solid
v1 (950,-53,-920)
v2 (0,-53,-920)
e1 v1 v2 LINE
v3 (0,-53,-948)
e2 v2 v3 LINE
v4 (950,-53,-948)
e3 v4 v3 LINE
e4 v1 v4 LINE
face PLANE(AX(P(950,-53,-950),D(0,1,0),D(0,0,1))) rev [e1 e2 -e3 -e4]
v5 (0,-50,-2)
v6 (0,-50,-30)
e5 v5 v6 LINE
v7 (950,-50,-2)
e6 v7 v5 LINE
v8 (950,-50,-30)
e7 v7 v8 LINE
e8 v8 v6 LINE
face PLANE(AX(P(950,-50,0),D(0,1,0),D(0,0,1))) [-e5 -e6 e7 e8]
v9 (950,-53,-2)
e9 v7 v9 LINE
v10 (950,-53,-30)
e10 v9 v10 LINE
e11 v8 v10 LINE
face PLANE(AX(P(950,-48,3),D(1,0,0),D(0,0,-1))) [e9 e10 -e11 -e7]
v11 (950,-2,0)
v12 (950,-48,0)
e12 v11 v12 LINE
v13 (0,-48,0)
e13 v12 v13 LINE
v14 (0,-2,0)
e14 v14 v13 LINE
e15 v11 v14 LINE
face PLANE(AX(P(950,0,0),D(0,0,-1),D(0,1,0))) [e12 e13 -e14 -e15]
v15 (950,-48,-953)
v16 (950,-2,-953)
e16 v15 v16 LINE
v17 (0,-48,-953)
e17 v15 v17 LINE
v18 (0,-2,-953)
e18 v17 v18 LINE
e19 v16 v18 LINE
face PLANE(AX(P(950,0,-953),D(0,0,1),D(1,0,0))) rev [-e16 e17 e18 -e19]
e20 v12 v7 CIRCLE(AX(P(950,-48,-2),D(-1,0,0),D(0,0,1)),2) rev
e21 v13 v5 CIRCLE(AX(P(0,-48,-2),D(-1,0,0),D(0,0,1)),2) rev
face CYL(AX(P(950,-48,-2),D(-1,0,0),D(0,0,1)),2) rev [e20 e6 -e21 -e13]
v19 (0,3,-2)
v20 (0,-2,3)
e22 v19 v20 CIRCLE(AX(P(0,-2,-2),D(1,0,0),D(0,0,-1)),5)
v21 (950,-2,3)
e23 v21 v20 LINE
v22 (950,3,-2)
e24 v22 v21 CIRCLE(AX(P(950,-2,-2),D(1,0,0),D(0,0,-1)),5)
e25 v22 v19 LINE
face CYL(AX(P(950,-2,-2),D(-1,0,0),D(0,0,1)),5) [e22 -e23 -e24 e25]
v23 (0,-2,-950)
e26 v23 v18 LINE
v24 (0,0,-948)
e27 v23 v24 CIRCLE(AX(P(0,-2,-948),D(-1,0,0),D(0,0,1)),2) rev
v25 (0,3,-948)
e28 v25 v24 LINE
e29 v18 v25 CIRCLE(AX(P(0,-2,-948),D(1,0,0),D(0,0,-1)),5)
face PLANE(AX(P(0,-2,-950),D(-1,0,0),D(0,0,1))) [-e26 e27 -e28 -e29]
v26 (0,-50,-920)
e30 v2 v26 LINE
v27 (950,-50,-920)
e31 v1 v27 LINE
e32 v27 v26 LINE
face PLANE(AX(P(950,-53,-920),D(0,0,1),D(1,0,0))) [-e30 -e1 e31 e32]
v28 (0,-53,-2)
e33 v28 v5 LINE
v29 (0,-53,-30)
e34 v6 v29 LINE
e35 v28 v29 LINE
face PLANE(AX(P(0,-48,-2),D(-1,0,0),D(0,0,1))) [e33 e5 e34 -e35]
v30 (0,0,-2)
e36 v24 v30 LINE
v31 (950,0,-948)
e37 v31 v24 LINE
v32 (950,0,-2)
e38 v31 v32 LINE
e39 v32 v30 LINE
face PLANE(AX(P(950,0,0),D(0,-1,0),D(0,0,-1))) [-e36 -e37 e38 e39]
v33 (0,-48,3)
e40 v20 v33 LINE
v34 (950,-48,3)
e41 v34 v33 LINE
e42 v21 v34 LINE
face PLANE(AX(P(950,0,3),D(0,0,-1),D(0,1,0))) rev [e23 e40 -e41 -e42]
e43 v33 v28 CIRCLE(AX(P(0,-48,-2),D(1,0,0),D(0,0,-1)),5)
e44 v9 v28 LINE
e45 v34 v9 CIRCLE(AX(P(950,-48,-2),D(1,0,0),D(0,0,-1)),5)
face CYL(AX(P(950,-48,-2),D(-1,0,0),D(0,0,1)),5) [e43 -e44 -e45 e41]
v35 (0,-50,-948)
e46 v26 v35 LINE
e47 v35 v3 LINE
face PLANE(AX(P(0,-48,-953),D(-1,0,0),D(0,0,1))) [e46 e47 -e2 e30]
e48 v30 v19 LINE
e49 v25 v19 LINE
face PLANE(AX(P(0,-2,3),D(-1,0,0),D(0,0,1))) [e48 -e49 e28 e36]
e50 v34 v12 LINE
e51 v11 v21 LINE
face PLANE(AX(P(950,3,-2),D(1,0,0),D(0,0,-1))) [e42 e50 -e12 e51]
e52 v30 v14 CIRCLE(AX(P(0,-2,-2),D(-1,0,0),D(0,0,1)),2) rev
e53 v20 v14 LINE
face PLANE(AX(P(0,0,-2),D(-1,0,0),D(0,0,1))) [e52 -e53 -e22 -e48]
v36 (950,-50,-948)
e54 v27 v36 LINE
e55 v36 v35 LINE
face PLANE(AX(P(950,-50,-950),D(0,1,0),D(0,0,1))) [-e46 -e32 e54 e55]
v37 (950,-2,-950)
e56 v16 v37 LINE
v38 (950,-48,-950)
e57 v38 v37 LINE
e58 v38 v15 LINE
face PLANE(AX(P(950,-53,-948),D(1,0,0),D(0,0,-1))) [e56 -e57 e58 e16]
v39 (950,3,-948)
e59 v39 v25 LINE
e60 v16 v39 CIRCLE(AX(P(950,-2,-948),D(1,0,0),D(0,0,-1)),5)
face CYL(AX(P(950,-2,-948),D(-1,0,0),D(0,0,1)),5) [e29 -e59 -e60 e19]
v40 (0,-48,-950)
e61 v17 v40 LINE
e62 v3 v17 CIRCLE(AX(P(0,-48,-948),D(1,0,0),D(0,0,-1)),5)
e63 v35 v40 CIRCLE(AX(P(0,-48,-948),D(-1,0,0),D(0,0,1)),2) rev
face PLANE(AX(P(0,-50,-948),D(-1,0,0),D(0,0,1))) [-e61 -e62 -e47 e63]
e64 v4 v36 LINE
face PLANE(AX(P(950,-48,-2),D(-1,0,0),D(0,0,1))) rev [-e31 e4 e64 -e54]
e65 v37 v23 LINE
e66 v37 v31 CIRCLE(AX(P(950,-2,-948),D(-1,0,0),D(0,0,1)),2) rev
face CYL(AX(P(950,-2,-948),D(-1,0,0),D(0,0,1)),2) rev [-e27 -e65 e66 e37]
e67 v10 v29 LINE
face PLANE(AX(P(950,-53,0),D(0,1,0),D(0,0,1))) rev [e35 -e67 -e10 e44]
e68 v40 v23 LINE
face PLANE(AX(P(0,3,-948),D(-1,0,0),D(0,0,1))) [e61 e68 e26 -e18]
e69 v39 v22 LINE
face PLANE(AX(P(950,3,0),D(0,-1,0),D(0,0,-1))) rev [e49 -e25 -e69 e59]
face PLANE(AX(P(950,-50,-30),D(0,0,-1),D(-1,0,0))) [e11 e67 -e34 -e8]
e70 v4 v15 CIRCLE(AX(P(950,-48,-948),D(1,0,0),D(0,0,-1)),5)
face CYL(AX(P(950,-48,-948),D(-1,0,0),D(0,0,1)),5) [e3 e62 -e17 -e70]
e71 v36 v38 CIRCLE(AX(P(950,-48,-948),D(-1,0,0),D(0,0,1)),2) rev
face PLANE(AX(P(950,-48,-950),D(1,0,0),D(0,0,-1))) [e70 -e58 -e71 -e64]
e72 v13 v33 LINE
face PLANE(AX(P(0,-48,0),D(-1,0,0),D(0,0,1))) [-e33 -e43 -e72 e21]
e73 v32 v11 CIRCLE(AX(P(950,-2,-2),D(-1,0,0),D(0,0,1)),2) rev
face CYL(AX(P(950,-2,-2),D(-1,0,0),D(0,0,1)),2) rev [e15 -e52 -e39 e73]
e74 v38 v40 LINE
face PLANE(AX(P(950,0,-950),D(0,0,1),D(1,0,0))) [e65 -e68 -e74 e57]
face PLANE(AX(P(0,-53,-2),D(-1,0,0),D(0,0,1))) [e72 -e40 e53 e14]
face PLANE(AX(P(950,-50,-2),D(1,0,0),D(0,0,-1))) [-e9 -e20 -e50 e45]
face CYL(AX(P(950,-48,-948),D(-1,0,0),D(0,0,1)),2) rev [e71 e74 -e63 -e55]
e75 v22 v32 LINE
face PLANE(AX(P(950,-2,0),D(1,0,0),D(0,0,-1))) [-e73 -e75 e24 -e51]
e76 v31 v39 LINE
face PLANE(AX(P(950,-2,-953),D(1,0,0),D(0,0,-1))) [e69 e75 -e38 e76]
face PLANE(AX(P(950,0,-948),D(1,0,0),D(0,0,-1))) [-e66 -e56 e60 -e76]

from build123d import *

# Parameters (mm, degrees)
BASE_FLANGIA1_DEPTH = 950


# Sheet-metal steps are written as plain solids
with BuildPart() as part:
    # Schizzo1 → Base-Flangia1 (new body)
    with BuildSketch(Plane(origin=(0, 0, 0), x_dir=(0, 0, -1), z_dir=(1, 0, 0))):
        with BuildLine():
            Line((30, -50), (2, -50))
            ThreePointArc((2, -50), (0.585786438, -49.414213562), (0, -48))
            Line((0, -48), (0, -2))
            ThreePointArc((0, -2), (0.585786438, -0.585786438), (2, 0))
            Line((2, 0), (948, 0))
            ThreePointArc((948, 0), (949.414213562, -0.585786438), (950, -2))
            Line((950, -2), (950, -48))
            ThreePointArc((950, -48), (949.414213562, -49.414213562), (948, -50))
            Line((948, -50), (920, -50))
            Line((920, -50), (920, -53))
            Line((920, -53), (948, -53))
            ThreePointArc((948, -53), (951.535533906, -51.535533906), (953, -48))
            Line((953, -48), (953, -2))
            ThreePointArc((953, -2), (951.535533906, 1.535533906), (948, 3))
            Line((948, 3), (2, 3))
            ThreePointArc((2, 3), (-1.535533906, 1.535533906), (-3, -2))
            Line((-3, -2), (-3, -48))
            ThreePointArc((-3, -48), (-1.535533906, -51.535533906), (2, -53))
            Line((2, -53), (30, -53))
            Line((30, -53), (30, -50))
        make_face()
    extrude(amount=BASE_FLANGIA1_DEPTH)


solid = part.part
